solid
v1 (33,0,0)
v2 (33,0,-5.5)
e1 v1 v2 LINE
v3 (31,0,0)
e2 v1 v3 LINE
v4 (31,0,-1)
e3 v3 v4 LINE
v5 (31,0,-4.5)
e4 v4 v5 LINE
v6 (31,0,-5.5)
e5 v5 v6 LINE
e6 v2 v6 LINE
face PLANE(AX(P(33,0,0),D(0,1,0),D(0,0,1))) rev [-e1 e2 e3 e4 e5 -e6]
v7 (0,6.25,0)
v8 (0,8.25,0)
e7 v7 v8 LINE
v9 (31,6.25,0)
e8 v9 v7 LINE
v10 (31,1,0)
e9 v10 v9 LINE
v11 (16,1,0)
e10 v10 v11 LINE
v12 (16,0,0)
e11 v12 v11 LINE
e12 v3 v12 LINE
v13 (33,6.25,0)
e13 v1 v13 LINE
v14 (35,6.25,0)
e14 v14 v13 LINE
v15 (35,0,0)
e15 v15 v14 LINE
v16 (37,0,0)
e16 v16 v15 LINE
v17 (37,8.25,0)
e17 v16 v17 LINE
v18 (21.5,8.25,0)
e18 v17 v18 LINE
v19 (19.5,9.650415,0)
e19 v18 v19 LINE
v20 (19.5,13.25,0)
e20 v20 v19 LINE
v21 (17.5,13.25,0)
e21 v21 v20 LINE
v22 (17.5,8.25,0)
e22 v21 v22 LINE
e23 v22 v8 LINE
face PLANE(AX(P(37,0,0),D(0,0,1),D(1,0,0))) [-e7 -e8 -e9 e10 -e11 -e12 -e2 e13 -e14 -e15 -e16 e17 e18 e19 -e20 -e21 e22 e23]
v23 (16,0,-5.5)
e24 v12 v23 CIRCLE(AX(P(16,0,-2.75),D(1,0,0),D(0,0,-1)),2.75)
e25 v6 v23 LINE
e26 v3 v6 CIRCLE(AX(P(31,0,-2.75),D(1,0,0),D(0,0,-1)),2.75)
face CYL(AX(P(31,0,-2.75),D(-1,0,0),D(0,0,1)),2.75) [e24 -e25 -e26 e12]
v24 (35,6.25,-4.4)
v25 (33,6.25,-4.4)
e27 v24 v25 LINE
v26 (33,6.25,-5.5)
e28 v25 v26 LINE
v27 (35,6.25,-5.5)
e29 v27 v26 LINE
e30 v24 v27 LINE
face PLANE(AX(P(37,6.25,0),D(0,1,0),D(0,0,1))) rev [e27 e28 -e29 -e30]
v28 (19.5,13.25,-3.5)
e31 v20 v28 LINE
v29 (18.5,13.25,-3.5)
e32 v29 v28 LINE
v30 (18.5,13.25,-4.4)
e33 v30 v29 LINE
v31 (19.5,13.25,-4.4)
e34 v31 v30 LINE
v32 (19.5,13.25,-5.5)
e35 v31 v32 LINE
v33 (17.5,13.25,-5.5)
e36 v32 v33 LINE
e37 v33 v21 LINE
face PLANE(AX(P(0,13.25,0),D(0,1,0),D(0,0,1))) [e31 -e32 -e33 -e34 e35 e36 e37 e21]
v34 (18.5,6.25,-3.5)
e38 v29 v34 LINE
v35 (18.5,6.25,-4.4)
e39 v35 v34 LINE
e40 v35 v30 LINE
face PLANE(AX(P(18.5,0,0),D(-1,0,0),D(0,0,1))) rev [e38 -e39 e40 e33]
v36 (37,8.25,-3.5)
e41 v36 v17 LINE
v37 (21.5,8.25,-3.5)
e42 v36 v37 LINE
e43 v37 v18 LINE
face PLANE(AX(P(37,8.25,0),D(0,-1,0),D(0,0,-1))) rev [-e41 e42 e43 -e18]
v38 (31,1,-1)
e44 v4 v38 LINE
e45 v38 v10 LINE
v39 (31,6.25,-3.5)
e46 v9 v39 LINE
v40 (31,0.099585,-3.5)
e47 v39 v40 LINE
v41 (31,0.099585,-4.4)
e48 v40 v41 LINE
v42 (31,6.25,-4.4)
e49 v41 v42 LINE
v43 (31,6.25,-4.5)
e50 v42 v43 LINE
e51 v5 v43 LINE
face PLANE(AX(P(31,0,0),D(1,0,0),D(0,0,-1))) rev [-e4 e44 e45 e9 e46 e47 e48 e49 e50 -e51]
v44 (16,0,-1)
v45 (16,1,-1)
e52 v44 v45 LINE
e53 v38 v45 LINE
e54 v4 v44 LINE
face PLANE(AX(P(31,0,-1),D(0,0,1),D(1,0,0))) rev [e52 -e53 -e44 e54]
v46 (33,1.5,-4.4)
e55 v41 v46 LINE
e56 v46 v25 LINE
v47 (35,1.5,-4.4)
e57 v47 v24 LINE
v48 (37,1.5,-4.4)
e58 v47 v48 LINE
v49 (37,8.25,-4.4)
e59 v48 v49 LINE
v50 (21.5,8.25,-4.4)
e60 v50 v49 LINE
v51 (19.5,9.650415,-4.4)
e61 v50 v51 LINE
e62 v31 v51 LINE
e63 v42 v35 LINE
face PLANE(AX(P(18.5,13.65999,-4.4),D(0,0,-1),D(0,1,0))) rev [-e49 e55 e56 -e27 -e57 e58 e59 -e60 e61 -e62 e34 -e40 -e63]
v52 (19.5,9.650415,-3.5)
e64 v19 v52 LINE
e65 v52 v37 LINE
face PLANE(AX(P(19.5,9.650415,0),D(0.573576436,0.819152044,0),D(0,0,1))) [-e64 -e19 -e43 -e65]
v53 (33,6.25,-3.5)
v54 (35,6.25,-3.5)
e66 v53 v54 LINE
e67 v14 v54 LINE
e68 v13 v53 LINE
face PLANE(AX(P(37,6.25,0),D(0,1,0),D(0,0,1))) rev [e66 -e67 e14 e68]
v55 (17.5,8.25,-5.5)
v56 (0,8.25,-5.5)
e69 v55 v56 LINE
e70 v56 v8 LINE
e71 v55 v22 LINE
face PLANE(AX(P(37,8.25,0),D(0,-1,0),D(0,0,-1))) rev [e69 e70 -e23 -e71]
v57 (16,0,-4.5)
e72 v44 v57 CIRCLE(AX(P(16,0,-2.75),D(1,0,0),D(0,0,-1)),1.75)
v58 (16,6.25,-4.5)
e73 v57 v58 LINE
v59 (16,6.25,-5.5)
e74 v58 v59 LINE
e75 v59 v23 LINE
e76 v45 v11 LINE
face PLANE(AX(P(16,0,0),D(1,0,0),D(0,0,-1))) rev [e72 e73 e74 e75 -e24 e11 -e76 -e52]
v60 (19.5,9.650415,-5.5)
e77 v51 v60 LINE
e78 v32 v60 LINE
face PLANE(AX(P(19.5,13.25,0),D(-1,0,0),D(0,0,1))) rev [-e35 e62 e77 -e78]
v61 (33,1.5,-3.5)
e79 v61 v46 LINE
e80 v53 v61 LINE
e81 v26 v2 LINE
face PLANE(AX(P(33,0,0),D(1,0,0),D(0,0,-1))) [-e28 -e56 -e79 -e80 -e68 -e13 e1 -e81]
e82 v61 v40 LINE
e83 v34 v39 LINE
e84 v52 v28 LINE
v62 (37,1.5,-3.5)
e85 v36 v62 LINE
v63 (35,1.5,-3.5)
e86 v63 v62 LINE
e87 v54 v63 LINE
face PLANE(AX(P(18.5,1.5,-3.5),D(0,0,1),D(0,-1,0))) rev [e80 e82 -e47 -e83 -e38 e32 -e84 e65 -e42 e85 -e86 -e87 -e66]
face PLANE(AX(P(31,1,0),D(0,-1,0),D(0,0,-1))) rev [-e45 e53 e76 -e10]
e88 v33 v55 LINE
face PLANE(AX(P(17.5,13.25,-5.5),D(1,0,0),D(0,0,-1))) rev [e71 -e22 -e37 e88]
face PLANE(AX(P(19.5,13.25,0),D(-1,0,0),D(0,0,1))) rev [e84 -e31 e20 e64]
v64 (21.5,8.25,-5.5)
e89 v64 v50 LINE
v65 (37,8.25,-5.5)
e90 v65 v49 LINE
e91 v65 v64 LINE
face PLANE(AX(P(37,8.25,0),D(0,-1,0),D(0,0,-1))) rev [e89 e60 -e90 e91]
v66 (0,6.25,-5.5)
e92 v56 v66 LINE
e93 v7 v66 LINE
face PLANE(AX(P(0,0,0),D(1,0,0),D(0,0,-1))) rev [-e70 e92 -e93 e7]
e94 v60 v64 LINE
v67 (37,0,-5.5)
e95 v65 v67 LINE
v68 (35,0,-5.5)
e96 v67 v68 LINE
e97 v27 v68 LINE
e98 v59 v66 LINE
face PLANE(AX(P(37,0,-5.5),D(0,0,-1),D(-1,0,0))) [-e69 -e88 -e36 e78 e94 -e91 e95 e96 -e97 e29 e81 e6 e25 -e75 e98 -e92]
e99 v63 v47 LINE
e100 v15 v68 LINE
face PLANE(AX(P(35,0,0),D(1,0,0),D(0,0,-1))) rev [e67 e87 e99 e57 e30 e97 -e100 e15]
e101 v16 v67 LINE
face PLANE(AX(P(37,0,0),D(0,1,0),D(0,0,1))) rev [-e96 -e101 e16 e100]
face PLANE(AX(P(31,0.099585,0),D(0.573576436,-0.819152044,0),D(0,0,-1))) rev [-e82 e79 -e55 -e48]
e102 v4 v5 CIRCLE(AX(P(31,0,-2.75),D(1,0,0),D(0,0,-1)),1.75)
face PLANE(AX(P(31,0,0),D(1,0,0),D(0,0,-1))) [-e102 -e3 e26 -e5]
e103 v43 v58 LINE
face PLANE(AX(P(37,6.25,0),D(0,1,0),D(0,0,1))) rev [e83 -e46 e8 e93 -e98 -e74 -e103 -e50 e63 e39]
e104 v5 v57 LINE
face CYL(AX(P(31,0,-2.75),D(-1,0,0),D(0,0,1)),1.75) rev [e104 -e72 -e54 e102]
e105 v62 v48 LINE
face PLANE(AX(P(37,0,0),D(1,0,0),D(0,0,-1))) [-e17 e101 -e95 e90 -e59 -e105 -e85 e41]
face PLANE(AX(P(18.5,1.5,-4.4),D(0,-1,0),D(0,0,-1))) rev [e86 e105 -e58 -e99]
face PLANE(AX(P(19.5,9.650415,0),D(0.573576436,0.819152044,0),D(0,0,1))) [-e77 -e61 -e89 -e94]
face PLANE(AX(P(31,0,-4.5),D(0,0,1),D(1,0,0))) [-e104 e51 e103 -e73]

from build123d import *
from OCP.BRepFilletAPI import BRepFilletAPI_MakeChamfer

# Parameters (mm, degrees)
SKETCH1_W           = 5.5
SKETCH1_H           = 2
BOSS_EXTRUDE1_DEPTH = 37
BOSS_EXTRUDE2_START = 35
SKETCH1_3_W         = 5.5
SKETCH1_3_H         = 6.25
BOSS_EXTRUDE2_DEPTH = 2
BOSS_EXTRUDE3_START = 31
SKETCH1_4_W         = 5.5
SKETCH1_4_H         = 6.25
BOSS_EXTRUDE3_DEPTH = 2
BOSS_EXTRUDE5_START = 16
BOSS_EXTRUDE5_DEPTH = 15
SKETCH2_W           = 2
SKETCH2_H           = 5.5
BOSS_EXTRUDE6_DEPTH = 5
SKETCH3_W           = 0.9
SKETCH3_H           = 12.159990002
CUT_EXTRUDE1_DEPTH  = 18.5
CHAMFER1_SIZE2      = 2
CHAMFER1_SIZE       = 1.400415076
CHAMFER2_SIZE       = 2
CHAMFER2_SIZE2      = 1.400415076


with BuildPart() as part:
    # Sketch1 → Boss-Extrude1 (new body)
    with BuildSketch(Plane(origin=(0, 0, 0), x_dir=(0, 0, -1), z_dir=(1, 0, 0))):
        with Locations((2.75, 7.25)):
            Rectangle(SKETCH1_W, SKETCH1_H)
    extrude(amount=BOSS_EXTRUDE1_DEPTH)

    # Sketch1<3> → Boss-Extrude2 (add)
    with BuildSketch(Plane(origin=(0, 0, 0), x_dir=(0, 0, -1), z_dir=(1, 0, 0)).offset(BOSS_EXTRUDE2_START)):
        with Locations((2.75, 3.125)):
            Rectangle(SKETCH1_3_W, SKETCH1_3_H)
    extrude(amount=BOSS_EXTRUDE2_DEPTH)

    # Sketch1<4> → Boss-Extrude3 (add)
    with BuildSketch(Plane(origin=(0, 0, 0), x_dir=(0, 0, -1), z_dir=(1, 0, 0)).offset(BOSS_EXTRUDE3_START)):
        with Locations((2.75, 3.125)):
            Rectangle(SKETCH1_4_W, SKETCH1_4_H)
    extrude(amount=BOSS_EXTRUDE3_DEPTH)

    # Sketch1<6> → Boss-Extrude5 (add)
    with BuildSketch(Plane(origin=(0, 0, 0), x_dir=(0, 0, -1), z_dir=(1, 0, 0)).offset(BOSS_EXTRUDE5_START)):
        with BuildLine():
            Line((0, 1), (0, 0))
            ThreePointArc((0, 0), (2.75, -2.75), (5.5, 0))
            Line((5.5, 0), (5.5, 6.25))
            Line((5.5, 6.25), (4.5, 6.25))
            Line((4.5, 6.25), (4.5, 0))
            ThreePointArc((4.5, 0), (2.75, -1.75), (1, 0))
            Line((1, 0), (1, 1))
            Line((1, 1), (0, 1))
        make_face()
    extrude(amount=BOSS_EXTRUDE5_DEPTH)

    # Sketch2 → Boss-Extrude6 (add)
    with BuildSketch(Plane(origin=(0, 8.25, 0), x_dir=(1, 0, 0), z_dir=(0, 1, 0))):
        with Locations((18.5, 2.75)):
            Rectangle(SKETCH2_W, SKETCH2_H)
    extrude(amount=BOSS_EXTRUDE6_DEPTH)

    # Sketch3 → Cut-Extrude1 (cut)
    with BuildSketch(Plane(origin=(37, 0, 0), x_dir=(0, 0, -1), z_dir=(1, 0, 0))):
        with Locations((3.95, 7.579995001)):
            Rectangle(SKETCH3_W, SKETCH3_H)
    extrude(amount=-CUT_EXTRUDE1_DEPTH, mode=Mode.SUBTRACT)

    # Chamfer1
    chamfer1_edges = [part.edges().sort_by_distance(p)[0] for p in [
        (31, 1.5, -3.95),
    ]]
    chamfer1_side = [part.faces().sort_by_distance(p)[0] for p in [
        (31, 1.471991698, -3.95),
    ]]
    chamfer(chamfer1_edges, length=CHAMFER1_SIZE - 0.0001, length2=CHAMFER1_SIZE2 - 0.0001, reference=chamfer1_side[0])  # a hair under: the kernel refuses the full size

    # Chamfer2: one chamfer whose edges measure the first distance from different faces: ONE call of the kernel's chamfer builder (chamfer() names one face for all edges)
    chamfer2_edges_1 = [part.edges().sort_by_distance(p)[0] for p in [
        (19.5, 8.25, -1.75),
    ]]
    chamfer2_side_1 = [part.faces().sort_by_distance(p)[0] for p in [
        (28.25, 8.25, -1.75),
    ]]
    chamfer2_edges_2 = [part.edges().sort_by_distance(p)[0] for p in [
        (19.5, 8.25, -4.95),
    ]]
    chamfer2_side_2 = [part.faces().sort_by_distance(p)[0] for p in [
        (28.25, 8.25, -4.95),
    ]]
    chamfer2 = BRepFilletAPI_MakeChamfer(part.part.solid().wrapped)
    for e in chamfer2_edges_1:
        chamfer2.Add(CHAMFER2_SIZE, CHAMFER2_SIZE2, e.wrapped, chamfer2_side_1[0].wrapped)  # the first distance lies on this face
    for e in chamfer2_edges_2:
        chamfer2.Add(CHAMFER2_SIZE, CHAMFER2_SIZE2, e.wrapped, chamfer2_side_2[0].wrapped)  # the first distance lies on this face
    add(Compound.cast(chamfer2.Shape()), mode=Mode.REPLACE)


solid = part.part
